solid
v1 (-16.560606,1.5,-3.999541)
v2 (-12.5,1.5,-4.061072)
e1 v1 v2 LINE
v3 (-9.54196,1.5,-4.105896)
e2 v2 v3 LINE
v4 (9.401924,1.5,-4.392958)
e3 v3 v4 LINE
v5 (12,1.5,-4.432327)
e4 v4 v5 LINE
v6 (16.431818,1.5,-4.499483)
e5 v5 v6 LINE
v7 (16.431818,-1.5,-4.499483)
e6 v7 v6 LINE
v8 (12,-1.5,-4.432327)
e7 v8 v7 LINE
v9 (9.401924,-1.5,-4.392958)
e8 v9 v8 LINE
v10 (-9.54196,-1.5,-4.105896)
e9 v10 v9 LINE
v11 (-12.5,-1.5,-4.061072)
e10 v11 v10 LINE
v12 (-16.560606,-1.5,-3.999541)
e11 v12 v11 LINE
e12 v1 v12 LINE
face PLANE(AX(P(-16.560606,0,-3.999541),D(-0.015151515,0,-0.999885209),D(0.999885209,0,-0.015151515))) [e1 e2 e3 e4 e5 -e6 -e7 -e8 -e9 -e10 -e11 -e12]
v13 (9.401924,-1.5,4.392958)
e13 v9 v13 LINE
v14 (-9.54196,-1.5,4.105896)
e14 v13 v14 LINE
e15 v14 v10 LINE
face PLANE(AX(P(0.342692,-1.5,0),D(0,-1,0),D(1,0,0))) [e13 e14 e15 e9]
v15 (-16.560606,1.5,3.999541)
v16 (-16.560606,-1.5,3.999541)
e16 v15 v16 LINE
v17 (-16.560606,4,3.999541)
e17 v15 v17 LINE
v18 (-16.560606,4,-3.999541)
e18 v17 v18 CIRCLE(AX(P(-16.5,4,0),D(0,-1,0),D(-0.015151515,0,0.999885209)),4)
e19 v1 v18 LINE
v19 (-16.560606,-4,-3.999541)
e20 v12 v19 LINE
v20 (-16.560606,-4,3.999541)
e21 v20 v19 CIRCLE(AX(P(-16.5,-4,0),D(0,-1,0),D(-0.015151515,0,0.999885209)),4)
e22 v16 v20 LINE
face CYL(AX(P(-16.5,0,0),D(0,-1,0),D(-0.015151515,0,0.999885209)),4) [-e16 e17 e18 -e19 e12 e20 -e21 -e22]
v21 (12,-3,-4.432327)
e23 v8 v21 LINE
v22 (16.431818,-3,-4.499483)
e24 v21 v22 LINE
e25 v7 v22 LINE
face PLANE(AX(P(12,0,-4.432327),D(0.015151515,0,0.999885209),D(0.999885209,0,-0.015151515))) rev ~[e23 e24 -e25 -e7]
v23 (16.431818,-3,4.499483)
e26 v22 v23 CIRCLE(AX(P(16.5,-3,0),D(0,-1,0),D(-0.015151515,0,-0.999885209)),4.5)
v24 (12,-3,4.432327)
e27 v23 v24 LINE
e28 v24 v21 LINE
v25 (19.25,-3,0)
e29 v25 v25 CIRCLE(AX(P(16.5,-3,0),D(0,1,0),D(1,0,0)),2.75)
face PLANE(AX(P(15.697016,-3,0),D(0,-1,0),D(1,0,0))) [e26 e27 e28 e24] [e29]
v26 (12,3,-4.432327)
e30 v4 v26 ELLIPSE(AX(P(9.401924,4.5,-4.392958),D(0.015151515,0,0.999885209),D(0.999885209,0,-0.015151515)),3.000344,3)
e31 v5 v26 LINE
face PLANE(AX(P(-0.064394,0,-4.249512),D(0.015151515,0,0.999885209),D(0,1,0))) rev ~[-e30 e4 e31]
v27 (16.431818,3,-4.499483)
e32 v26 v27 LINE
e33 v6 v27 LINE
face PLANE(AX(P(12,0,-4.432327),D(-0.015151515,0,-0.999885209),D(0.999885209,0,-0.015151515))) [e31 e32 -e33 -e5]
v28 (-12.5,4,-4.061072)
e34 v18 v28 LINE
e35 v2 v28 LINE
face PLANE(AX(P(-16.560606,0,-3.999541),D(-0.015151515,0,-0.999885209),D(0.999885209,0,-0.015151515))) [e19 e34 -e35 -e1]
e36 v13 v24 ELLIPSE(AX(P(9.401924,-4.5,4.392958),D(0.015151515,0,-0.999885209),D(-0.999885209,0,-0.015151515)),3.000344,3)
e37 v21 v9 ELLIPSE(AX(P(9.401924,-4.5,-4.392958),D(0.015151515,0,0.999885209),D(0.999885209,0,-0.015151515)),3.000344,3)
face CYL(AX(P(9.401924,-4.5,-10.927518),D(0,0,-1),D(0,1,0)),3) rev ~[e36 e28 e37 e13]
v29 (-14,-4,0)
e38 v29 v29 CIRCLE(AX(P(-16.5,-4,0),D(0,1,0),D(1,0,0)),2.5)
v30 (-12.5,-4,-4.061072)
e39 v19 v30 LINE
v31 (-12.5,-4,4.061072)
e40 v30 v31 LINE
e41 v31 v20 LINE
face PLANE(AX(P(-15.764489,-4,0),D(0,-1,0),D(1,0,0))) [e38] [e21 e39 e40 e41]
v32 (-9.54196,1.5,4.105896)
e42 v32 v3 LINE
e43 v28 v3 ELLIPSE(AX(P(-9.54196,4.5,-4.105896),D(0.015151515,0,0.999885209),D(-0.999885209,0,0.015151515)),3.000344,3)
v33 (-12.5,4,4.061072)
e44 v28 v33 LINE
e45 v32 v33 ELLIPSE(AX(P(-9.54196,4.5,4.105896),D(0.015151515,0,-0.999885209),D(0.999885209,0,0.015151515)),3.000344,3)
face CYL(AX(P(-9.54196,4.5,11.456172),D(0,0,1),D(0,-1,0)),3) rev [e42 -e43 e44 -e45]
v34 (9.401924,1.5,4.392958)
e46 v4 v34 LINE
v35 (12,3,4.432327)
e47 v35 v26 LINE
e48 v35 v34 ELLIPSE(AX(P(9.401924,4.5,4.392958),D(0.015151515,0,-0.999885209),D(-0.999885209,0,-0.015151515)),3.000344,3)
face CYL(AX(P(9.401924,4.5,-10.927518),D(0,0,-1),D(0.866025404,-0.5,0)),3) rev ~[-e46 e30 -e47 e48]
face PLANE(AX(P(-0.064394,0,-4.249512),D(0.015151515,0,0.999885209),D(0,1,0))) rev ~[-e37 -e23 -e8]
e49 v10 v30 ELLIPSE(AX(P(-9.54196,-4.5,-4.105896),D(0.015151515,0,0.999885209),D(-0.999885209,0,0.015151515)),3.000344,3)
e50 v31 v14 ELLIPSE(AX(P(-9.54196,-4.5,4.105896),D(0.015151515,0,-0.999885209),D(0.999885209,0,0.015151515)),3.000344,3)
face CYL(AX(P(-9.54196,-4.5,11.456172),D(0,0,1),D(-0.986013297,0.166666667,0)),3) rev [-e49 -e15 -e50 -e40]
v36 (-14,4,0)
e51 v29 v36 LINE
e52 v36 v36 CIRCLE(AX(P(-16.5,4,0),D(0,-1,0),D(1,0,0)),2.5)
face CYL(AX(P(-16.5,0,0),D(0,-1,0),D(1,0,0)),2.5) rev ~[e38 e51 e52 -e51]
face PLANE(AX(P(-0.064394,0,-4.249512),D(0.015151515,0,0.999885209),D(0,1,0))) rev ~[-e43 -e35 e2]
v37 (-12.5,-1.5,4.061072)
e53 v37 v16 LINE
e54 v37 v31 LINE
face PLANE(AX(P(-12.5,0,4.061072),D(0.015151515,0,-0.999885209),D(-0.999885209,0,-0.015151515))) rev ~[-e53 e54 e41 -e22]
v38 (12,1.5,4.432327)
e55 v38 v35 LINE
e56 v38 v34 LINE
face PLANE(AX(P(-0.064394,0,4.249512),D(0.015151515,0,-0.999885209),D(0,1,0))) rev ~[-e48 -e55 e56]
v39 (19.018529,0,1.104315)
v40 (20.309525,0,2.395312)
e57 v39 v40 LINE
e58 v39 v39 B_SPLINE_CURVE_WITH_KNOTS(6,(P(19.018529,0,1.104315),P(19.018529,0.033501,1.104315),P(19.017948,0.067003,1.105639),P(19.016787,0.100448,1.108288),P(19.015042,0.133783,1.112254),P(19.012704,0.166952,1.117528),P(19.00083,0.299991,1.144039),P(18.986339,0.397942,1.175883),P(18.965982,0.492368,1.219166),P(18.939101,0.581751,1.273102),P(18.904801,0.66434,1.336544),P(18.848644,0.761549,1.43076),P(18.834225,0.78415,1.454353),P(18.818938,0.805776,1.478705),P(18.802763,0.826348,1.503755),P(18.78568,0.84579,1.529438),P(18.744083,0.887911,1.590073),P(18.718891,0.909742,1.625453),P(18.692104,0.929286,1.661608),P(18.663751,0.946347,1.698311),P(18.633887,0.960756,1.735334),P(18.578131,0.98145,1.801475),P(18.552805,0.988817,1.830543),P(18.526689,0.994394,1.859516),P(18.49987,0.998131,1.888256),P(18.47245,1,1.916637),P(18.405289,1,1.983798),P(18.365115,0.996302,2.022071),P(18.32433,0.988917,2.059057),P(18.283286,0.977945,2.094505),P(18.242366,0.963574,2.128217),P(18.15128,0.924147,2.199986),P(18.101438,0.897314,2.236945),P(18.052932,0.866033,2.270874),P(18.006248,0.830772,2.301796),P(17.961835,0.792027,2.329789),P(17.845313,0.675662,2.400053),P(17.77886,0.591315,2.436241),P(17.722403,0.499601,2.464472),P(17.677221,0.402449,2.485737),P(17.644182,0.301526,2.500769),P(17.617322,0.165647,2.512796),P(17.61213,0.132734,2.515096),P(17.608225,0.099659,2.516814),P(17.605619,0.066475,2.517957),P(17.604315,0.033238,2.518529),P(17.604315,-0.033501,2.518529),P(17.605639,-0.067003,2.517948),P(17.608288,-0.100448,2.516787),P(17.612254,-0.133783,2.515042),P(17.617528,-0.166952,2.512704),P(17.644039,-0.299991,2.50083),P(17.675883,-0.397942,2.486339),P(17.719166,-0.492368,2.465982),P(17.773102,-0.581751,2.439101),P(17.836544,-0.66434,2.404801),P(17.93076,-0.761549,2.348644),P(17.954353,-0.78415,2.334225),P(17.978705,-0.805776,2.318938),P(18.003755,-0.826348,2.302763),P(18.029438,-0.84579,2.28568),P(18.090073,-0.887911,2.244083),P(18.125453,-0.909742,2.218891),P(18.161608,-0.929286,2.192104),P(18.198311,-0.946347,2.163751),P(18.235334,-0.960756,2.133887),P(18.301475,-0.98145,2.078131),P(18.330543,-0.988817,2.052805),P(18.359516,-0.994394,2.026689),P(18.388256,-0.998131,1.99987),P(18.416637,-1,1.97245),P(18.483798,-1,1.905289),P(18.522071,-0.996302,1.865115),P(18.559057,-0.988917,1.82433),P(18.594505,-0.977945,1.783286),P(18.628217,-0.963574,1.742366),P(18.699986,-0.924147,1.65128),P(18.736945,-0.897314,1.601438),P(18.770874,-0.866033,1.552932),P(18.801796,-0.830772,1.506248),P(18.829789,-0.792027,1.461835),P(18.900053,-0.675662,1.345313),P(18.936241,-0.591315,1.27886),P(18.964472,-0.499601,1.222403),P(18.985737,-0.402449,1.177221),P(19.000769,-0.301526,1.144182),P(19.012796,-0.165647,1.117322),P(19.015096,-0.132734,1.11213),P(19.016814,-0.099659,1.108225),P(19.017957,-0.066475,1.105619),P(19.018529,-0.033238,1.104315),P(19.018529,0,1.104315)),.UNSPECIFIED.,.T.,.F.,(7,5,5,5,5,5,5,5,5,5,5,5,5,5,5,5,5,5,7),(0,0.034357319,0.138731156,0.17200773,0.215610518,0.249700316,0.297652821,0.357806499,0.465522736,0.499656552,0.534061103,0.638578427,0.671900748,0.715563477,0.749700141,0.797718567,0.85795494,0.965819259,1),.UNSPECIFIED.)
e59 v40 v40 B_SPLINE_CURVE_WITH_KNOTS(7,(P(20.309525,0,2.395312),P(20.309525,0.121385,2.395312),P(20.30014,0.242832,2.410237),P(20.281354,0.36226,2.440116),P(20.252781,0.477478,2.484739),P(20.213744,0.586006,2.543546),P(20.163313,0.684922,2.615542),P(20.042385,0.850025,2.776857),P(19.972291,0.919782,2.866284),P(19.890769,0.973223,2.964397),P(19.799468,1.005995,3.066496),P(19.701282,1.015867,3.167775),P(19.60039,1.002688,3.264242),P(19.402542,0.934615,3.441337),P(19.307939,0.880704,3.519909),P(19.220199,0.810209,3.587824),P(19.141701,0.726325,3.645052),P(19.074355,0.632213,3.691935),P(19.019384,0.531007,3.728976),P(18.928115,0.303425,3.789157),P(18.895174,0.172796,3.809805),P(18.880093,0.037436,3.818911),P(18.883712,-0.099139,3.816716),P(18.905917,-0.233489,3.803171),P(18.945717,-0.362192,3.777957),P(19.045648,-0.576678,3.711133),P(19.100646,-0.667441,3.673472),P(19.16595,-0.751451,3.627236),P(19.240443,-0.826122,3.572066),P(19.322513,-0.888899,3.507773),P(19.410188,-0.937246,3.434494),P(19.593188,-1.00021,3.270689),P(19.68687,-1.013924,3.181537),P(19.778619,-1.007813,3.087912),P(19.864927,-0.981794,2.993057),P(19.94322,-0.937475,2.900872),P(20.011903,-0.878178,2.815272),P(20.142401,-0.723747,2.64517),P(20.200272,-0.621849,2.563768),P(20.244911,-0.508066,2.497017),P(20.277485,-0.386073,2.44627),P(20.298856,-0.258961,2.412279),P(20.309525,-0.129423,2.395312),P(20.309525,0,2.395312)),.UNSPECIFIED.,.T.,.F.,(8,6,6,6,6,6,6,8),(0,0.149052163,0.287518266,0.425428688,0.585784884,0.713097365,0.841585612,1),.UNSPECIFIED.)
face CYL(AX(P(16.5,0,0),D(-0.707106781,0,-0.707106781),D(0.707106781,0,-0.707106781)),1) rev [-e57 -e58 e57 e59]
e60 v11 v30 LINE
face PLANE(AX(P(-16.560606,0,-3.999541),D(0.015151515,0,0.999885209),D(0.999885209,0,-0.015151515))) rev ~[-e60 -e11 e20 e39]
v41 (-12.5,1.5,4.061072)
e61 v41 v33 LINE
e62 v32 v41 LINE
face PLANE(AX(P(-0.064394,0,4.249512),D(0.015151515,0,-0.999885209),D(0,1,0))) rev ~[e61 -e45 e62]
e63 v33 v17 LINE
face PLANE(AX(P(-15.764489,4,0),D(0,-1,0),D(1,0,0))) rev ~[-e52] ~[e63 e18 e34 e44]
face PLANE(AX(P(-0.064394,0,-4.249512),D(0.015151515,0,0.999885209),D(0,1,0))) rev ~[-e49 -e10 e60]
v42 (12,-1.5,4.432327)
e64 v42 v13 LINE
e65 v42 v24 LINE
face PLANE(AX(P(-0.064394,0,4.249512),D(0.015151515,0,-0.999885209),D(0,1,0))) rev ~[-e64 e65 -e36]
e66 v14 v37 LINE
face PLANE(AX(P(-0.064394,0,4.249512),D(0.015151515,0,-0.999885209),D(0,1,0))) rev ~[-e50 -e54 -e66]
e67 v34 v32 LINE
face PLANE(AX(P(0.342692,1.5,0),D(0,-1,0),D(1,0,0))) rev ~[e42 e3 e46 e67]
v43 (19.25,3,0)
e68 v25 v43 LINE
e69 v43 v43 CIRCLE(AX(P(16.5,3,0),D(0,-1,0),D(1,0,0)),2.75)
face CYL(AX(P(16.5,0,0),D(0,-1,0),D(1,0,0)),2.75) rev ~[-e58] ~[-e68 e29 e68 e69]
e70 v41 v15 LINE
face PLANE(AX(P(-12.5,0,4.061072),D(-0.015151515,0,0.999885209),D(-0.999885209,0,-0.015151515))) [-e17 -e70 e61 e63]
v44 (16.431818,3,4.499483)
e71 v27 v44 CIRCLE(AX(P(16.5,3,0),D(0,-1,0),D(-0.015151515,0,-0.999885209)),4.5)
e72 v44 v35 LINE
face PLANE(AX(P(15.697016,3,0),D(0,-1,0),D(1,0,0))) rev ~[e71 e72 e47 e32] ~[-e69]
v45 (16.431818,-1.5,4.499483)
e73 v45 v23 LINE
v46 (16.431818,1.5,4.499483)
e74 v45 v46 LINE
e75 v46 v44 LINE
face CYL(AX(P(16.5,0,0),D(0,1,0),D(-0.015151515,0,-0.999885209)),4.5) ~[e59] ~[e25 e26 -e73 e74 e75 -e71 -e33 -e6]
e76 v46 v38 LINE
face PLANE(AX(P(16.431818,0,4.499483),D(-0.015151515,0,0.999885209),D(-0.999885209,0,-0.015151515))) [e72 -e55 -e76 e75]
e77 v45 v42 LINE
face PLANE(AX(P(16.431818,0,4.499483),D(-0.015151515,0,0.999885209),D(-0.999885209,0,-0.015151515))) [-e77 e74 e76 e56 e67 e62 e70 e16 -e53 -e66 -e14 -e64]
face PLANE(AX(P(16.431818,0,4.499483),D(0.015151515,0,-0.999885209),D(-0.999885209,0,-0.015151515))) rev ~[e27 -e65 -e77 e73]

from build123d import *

# Parameters (mm, degrees)
F1_DEPTH      = 1.5
F1_DEPTH_BACK = 1.5
F3_DEPTH      = 4
F3_DEPTH_BACK = 4
F5_DEPTH      = 3
F5_DEPTH_BACK = 3
F6_R          = 2.5
F6_R_2        = 2.75
F7_DEPTH      = 4.001
F7_DEPTH_BACK = 4.001
F8_T4_DEPTH   = 22.9123439264
F8_T10_DEPTH  = 21.8550350011
F8_T16_DEPTH  = 21.8550350011
F8_T22_DEPTH  = 22.9123439264
F10_R         = 1
F11_DEPTH     = 6.3649610307


# Not quite as in the source:
# - a fillet or chamfer that OpenCascade refuses, or shapes differently, is made with other operations: its cross-section is extruded or revolved along the edge and cut away or added


with BuildPart() as f1:
    # F0 (on Front) → F1 (new body, two sides)
    with BuildSketch(Plane.XZ) as f1_sk:
        with BuildLine():
            Line((16.4318181818, 4.4994834414), (-16.5606060606, 3.9995408368))
            ThreePointArc((-16.5606060606, 3.9995408368), (-20.5, 0), (-16.5606060606, -3.9995408368))
            Line((-16.5606060606, -3.9995408368), (16.4318181818, -4.4994834414))
            ThreePointArc((16.4318181818, -4.4994834414), (21, 0), (16.4318181818, 4.4994834414))
        make_face()
    extrude(amount=F1_DEPTH)
    extrude(f1_sk.sketch, amount=-F1_DEPTH_BACK)

    # F2 (on Front) → F3 (join, two sides)
    with BuildSketch(Plane.XZ) as f3_sk:
        with BuildLine():
            Line((-12.5, 4.0610722343), (-16.5606060606, 3.9995408368))
            ThreePointArc((-16.5606060606, 3.9995408368), (-20.5, 0), (-16.5606060606, -3.9995408368))
            Line((-16.5606060606, -3.9995408368), (-12.5, -4.0610722343))
            Line((-12.5, -4.0610722343), (-12.5, 4.0610722343))
        make_face()
    extrude(amount=F3_DEPTH)
    extrude(f3_sk.sketch, amount=-F3_DEPTH_BACK)

    # F4 (on Front) → F5 (join, two sides)
    with BuildSketch(Plane.XZ) as f5_sk:
        with BuildLine():
            Line((16.4318181818, 4.4994834414), (12, 4.4323269722))
            Line((12, 4.4323269722), (12, -4.4323269722))
            Line((12, -4.4323269722), (16.4318181818, -4.4994834414))
            ThreePointArc((16.4318181818, -4.4994834414), (21, 0), (16.4318181818, 4.4994834414))
        make_face()
    extrude(amount=F5_DEPTH)
    extrude(f5_sk.sketch, amount=-F5_DEPTH_BACK)

    # F6 (on Front) → F7 (cut, two sides)
    with BuildSketch(Plane.XZ) as f7_sk:
        with Locations((-16.5, 0)):
            Circle(F6_R)
        with Locations((16.5, 0)):
            Circle(F6_R_2)
    extrude(amount=-F7_DEPTH, mode=Mode.SUBTRACT)
    extrude(f7_sk.sketch, amount=F7_DEPTH_BACK, mode=Mode.SUBTRACT)

    # F8: fillet of radius 3 on 4 edges, made by hand


with BuildPart() as f8_tool2:
    # F8_s3 → F8_t4 (new body)
    with BuildSketch(Plane.XY.offset(11.4561719632)):
        with BuildLine():
            ThreePointArc((-12.5, -4), (-11.4784517816, -2.2087121525), (-9.5419601084, -1.5))
            Line((-9.5419601084, -1.5), (-12.5, -1.5))
            Line((-12.5, -1.5), (-12.5, -4))
        make_face()
    extrude(amount=-F8_T4_DEPTH)

    split(bisect_by=Plane(origin=(-0.0643939394, 0, -4.2495121391), x_dir=(0, 1, 0), z_dir=(0.0151515152, 0, 0.9998852092)), keep=Keep.TOP)

    split(bisect_by=Plane(origin=(-0.0643939394, 0, 4.2495121391), x_dir=(0, 1, 0), z_dir=(0.0151515152, 0, -0.9998852092)), keep=Keep.TOP)


with BuildPart() as f1_1:
    add(f1.part)

    # F8_t1: union F8_tool2
    add(f8_tool2.part)


with BuildPart() as f8_tool8:
    # F8_s9 → F8_t10 (new body)
    with BuildSketch(Plane.XY.offset(-10.9275175005)):
        with BuildLine():
            ThreePointArc((9.4019237886, -1.5), (10.9019237886, -1.9019237886), (12, -3))
            Line((12, -3), (12, -1.5))
            Line((12, -1.5), (9.4019237886, -1.5))
        make_face()
    extrude(amount=F8_T10_DEPTH)

    split(bisect_by=Plane(origin=(-0.0643939394, 0, -4.2495121391), x_dir=(0, 1, 0), z_dir=(0.0151515152, 0, 0.9998852092)), keep=Keep.TOP)

    split(bisect_by=Plane(origin=(-0.0643939394, 0, 4.2495121391), x_dir=(0, 1, 0), z_dir=(0.0151515152, 0, -0.9998852092)), keep=Keep.TOP)


with BuildPart() as f1_2:
    add(f1_1.part)

    # F8_t7: union F8_tool8
    add(f8_tool8.part)


with BuildPart() as f8_tool14:
    # F8_s15 → F8_t16 (new body)
    with BuildSketch(Plane.XY.offset(-10.9275175005)):
        with BuildLine():
            ThreePointArc((12, 3), (10.9019237886, 1.9019237886), (9.4019237886, 1.5))
            Line((9.4019237886, 1.5), (12, 1.5))
            Line((12, 1.5), (12, 3))
        make_face()
    extrude(amount=F8_T16_DEPTH)

    split(bisect_by=Plane(origin=(-0.0643939394, 0, -4.2495121391), x_dir=(0, 1, 0), z_dir=(0.0151515152, 0, 0.9998852092)), keep=Keep.TOP)

    split(bisect_by=Plane(origin=(-0.0643939394, 0, 4.2495121391), x_dir=(0, 1, 0), z_dir=(0.0151515152, 0, -0.9998852092)), keep=Keep.TOP)


with BuildPart() as f1_3:
    add(f1_2.part)

    # F8_t13: union F8_tool14
    add(f8_tool14.part)


with BuildPart() as f8_tool20:
    # F8_s21 → F8_t22 (new body)
    with BuildSketch(Plane.XY.offset(11.4561719632)):
        with BuildLine():
            ThreePointArc((-9.5419601084, 1.5), (-11.4784517816, 2.2087121525), (-12.5, 4))
            Line((-12.5, 4), (-12.5, 1.5))
            Line((-12.5, 1.5), (-9.5419601084, 1.5))
        make_face()
    extrude(amount=-F8_T22_DEPTH)

    split(bisect_by=Plane(origin=(-0.0643939394, 0, -4.2495121391), x_dir=(0, 1, 0), z_dir=(0.0151515152, 0, 0.9998852092)), keep=Keep.TOP)

    split(bisect_by=Plane(origin=(-0.0643939394, 0, 4.2495121391), x_dir=(0, 1, 0), z_dir=(0.0151515152, 0, -0.9998852092)), keep=Keep.TOP)


with BuildPart() as f1_4:
    add(f1_3.part)

    # F8_t19: union F8_tool20
    add(f8_tool20.part)

    # F10 (on face) → F11 (cut, through all)
    with BuildSketch(Plane(origin=(8.25, 0, 8.25), x_dir=(0.7071067812, 0, -0.7071067812), z_dir=(0.7071067812, 0, 0.7071067812))):
        with Locations((11.6672618896, 0)):
            Circle(F10_R)
    extrude(amount=F11_DEPTH, mode=Mode.SUBTRACT)


solid = f1_4.part
